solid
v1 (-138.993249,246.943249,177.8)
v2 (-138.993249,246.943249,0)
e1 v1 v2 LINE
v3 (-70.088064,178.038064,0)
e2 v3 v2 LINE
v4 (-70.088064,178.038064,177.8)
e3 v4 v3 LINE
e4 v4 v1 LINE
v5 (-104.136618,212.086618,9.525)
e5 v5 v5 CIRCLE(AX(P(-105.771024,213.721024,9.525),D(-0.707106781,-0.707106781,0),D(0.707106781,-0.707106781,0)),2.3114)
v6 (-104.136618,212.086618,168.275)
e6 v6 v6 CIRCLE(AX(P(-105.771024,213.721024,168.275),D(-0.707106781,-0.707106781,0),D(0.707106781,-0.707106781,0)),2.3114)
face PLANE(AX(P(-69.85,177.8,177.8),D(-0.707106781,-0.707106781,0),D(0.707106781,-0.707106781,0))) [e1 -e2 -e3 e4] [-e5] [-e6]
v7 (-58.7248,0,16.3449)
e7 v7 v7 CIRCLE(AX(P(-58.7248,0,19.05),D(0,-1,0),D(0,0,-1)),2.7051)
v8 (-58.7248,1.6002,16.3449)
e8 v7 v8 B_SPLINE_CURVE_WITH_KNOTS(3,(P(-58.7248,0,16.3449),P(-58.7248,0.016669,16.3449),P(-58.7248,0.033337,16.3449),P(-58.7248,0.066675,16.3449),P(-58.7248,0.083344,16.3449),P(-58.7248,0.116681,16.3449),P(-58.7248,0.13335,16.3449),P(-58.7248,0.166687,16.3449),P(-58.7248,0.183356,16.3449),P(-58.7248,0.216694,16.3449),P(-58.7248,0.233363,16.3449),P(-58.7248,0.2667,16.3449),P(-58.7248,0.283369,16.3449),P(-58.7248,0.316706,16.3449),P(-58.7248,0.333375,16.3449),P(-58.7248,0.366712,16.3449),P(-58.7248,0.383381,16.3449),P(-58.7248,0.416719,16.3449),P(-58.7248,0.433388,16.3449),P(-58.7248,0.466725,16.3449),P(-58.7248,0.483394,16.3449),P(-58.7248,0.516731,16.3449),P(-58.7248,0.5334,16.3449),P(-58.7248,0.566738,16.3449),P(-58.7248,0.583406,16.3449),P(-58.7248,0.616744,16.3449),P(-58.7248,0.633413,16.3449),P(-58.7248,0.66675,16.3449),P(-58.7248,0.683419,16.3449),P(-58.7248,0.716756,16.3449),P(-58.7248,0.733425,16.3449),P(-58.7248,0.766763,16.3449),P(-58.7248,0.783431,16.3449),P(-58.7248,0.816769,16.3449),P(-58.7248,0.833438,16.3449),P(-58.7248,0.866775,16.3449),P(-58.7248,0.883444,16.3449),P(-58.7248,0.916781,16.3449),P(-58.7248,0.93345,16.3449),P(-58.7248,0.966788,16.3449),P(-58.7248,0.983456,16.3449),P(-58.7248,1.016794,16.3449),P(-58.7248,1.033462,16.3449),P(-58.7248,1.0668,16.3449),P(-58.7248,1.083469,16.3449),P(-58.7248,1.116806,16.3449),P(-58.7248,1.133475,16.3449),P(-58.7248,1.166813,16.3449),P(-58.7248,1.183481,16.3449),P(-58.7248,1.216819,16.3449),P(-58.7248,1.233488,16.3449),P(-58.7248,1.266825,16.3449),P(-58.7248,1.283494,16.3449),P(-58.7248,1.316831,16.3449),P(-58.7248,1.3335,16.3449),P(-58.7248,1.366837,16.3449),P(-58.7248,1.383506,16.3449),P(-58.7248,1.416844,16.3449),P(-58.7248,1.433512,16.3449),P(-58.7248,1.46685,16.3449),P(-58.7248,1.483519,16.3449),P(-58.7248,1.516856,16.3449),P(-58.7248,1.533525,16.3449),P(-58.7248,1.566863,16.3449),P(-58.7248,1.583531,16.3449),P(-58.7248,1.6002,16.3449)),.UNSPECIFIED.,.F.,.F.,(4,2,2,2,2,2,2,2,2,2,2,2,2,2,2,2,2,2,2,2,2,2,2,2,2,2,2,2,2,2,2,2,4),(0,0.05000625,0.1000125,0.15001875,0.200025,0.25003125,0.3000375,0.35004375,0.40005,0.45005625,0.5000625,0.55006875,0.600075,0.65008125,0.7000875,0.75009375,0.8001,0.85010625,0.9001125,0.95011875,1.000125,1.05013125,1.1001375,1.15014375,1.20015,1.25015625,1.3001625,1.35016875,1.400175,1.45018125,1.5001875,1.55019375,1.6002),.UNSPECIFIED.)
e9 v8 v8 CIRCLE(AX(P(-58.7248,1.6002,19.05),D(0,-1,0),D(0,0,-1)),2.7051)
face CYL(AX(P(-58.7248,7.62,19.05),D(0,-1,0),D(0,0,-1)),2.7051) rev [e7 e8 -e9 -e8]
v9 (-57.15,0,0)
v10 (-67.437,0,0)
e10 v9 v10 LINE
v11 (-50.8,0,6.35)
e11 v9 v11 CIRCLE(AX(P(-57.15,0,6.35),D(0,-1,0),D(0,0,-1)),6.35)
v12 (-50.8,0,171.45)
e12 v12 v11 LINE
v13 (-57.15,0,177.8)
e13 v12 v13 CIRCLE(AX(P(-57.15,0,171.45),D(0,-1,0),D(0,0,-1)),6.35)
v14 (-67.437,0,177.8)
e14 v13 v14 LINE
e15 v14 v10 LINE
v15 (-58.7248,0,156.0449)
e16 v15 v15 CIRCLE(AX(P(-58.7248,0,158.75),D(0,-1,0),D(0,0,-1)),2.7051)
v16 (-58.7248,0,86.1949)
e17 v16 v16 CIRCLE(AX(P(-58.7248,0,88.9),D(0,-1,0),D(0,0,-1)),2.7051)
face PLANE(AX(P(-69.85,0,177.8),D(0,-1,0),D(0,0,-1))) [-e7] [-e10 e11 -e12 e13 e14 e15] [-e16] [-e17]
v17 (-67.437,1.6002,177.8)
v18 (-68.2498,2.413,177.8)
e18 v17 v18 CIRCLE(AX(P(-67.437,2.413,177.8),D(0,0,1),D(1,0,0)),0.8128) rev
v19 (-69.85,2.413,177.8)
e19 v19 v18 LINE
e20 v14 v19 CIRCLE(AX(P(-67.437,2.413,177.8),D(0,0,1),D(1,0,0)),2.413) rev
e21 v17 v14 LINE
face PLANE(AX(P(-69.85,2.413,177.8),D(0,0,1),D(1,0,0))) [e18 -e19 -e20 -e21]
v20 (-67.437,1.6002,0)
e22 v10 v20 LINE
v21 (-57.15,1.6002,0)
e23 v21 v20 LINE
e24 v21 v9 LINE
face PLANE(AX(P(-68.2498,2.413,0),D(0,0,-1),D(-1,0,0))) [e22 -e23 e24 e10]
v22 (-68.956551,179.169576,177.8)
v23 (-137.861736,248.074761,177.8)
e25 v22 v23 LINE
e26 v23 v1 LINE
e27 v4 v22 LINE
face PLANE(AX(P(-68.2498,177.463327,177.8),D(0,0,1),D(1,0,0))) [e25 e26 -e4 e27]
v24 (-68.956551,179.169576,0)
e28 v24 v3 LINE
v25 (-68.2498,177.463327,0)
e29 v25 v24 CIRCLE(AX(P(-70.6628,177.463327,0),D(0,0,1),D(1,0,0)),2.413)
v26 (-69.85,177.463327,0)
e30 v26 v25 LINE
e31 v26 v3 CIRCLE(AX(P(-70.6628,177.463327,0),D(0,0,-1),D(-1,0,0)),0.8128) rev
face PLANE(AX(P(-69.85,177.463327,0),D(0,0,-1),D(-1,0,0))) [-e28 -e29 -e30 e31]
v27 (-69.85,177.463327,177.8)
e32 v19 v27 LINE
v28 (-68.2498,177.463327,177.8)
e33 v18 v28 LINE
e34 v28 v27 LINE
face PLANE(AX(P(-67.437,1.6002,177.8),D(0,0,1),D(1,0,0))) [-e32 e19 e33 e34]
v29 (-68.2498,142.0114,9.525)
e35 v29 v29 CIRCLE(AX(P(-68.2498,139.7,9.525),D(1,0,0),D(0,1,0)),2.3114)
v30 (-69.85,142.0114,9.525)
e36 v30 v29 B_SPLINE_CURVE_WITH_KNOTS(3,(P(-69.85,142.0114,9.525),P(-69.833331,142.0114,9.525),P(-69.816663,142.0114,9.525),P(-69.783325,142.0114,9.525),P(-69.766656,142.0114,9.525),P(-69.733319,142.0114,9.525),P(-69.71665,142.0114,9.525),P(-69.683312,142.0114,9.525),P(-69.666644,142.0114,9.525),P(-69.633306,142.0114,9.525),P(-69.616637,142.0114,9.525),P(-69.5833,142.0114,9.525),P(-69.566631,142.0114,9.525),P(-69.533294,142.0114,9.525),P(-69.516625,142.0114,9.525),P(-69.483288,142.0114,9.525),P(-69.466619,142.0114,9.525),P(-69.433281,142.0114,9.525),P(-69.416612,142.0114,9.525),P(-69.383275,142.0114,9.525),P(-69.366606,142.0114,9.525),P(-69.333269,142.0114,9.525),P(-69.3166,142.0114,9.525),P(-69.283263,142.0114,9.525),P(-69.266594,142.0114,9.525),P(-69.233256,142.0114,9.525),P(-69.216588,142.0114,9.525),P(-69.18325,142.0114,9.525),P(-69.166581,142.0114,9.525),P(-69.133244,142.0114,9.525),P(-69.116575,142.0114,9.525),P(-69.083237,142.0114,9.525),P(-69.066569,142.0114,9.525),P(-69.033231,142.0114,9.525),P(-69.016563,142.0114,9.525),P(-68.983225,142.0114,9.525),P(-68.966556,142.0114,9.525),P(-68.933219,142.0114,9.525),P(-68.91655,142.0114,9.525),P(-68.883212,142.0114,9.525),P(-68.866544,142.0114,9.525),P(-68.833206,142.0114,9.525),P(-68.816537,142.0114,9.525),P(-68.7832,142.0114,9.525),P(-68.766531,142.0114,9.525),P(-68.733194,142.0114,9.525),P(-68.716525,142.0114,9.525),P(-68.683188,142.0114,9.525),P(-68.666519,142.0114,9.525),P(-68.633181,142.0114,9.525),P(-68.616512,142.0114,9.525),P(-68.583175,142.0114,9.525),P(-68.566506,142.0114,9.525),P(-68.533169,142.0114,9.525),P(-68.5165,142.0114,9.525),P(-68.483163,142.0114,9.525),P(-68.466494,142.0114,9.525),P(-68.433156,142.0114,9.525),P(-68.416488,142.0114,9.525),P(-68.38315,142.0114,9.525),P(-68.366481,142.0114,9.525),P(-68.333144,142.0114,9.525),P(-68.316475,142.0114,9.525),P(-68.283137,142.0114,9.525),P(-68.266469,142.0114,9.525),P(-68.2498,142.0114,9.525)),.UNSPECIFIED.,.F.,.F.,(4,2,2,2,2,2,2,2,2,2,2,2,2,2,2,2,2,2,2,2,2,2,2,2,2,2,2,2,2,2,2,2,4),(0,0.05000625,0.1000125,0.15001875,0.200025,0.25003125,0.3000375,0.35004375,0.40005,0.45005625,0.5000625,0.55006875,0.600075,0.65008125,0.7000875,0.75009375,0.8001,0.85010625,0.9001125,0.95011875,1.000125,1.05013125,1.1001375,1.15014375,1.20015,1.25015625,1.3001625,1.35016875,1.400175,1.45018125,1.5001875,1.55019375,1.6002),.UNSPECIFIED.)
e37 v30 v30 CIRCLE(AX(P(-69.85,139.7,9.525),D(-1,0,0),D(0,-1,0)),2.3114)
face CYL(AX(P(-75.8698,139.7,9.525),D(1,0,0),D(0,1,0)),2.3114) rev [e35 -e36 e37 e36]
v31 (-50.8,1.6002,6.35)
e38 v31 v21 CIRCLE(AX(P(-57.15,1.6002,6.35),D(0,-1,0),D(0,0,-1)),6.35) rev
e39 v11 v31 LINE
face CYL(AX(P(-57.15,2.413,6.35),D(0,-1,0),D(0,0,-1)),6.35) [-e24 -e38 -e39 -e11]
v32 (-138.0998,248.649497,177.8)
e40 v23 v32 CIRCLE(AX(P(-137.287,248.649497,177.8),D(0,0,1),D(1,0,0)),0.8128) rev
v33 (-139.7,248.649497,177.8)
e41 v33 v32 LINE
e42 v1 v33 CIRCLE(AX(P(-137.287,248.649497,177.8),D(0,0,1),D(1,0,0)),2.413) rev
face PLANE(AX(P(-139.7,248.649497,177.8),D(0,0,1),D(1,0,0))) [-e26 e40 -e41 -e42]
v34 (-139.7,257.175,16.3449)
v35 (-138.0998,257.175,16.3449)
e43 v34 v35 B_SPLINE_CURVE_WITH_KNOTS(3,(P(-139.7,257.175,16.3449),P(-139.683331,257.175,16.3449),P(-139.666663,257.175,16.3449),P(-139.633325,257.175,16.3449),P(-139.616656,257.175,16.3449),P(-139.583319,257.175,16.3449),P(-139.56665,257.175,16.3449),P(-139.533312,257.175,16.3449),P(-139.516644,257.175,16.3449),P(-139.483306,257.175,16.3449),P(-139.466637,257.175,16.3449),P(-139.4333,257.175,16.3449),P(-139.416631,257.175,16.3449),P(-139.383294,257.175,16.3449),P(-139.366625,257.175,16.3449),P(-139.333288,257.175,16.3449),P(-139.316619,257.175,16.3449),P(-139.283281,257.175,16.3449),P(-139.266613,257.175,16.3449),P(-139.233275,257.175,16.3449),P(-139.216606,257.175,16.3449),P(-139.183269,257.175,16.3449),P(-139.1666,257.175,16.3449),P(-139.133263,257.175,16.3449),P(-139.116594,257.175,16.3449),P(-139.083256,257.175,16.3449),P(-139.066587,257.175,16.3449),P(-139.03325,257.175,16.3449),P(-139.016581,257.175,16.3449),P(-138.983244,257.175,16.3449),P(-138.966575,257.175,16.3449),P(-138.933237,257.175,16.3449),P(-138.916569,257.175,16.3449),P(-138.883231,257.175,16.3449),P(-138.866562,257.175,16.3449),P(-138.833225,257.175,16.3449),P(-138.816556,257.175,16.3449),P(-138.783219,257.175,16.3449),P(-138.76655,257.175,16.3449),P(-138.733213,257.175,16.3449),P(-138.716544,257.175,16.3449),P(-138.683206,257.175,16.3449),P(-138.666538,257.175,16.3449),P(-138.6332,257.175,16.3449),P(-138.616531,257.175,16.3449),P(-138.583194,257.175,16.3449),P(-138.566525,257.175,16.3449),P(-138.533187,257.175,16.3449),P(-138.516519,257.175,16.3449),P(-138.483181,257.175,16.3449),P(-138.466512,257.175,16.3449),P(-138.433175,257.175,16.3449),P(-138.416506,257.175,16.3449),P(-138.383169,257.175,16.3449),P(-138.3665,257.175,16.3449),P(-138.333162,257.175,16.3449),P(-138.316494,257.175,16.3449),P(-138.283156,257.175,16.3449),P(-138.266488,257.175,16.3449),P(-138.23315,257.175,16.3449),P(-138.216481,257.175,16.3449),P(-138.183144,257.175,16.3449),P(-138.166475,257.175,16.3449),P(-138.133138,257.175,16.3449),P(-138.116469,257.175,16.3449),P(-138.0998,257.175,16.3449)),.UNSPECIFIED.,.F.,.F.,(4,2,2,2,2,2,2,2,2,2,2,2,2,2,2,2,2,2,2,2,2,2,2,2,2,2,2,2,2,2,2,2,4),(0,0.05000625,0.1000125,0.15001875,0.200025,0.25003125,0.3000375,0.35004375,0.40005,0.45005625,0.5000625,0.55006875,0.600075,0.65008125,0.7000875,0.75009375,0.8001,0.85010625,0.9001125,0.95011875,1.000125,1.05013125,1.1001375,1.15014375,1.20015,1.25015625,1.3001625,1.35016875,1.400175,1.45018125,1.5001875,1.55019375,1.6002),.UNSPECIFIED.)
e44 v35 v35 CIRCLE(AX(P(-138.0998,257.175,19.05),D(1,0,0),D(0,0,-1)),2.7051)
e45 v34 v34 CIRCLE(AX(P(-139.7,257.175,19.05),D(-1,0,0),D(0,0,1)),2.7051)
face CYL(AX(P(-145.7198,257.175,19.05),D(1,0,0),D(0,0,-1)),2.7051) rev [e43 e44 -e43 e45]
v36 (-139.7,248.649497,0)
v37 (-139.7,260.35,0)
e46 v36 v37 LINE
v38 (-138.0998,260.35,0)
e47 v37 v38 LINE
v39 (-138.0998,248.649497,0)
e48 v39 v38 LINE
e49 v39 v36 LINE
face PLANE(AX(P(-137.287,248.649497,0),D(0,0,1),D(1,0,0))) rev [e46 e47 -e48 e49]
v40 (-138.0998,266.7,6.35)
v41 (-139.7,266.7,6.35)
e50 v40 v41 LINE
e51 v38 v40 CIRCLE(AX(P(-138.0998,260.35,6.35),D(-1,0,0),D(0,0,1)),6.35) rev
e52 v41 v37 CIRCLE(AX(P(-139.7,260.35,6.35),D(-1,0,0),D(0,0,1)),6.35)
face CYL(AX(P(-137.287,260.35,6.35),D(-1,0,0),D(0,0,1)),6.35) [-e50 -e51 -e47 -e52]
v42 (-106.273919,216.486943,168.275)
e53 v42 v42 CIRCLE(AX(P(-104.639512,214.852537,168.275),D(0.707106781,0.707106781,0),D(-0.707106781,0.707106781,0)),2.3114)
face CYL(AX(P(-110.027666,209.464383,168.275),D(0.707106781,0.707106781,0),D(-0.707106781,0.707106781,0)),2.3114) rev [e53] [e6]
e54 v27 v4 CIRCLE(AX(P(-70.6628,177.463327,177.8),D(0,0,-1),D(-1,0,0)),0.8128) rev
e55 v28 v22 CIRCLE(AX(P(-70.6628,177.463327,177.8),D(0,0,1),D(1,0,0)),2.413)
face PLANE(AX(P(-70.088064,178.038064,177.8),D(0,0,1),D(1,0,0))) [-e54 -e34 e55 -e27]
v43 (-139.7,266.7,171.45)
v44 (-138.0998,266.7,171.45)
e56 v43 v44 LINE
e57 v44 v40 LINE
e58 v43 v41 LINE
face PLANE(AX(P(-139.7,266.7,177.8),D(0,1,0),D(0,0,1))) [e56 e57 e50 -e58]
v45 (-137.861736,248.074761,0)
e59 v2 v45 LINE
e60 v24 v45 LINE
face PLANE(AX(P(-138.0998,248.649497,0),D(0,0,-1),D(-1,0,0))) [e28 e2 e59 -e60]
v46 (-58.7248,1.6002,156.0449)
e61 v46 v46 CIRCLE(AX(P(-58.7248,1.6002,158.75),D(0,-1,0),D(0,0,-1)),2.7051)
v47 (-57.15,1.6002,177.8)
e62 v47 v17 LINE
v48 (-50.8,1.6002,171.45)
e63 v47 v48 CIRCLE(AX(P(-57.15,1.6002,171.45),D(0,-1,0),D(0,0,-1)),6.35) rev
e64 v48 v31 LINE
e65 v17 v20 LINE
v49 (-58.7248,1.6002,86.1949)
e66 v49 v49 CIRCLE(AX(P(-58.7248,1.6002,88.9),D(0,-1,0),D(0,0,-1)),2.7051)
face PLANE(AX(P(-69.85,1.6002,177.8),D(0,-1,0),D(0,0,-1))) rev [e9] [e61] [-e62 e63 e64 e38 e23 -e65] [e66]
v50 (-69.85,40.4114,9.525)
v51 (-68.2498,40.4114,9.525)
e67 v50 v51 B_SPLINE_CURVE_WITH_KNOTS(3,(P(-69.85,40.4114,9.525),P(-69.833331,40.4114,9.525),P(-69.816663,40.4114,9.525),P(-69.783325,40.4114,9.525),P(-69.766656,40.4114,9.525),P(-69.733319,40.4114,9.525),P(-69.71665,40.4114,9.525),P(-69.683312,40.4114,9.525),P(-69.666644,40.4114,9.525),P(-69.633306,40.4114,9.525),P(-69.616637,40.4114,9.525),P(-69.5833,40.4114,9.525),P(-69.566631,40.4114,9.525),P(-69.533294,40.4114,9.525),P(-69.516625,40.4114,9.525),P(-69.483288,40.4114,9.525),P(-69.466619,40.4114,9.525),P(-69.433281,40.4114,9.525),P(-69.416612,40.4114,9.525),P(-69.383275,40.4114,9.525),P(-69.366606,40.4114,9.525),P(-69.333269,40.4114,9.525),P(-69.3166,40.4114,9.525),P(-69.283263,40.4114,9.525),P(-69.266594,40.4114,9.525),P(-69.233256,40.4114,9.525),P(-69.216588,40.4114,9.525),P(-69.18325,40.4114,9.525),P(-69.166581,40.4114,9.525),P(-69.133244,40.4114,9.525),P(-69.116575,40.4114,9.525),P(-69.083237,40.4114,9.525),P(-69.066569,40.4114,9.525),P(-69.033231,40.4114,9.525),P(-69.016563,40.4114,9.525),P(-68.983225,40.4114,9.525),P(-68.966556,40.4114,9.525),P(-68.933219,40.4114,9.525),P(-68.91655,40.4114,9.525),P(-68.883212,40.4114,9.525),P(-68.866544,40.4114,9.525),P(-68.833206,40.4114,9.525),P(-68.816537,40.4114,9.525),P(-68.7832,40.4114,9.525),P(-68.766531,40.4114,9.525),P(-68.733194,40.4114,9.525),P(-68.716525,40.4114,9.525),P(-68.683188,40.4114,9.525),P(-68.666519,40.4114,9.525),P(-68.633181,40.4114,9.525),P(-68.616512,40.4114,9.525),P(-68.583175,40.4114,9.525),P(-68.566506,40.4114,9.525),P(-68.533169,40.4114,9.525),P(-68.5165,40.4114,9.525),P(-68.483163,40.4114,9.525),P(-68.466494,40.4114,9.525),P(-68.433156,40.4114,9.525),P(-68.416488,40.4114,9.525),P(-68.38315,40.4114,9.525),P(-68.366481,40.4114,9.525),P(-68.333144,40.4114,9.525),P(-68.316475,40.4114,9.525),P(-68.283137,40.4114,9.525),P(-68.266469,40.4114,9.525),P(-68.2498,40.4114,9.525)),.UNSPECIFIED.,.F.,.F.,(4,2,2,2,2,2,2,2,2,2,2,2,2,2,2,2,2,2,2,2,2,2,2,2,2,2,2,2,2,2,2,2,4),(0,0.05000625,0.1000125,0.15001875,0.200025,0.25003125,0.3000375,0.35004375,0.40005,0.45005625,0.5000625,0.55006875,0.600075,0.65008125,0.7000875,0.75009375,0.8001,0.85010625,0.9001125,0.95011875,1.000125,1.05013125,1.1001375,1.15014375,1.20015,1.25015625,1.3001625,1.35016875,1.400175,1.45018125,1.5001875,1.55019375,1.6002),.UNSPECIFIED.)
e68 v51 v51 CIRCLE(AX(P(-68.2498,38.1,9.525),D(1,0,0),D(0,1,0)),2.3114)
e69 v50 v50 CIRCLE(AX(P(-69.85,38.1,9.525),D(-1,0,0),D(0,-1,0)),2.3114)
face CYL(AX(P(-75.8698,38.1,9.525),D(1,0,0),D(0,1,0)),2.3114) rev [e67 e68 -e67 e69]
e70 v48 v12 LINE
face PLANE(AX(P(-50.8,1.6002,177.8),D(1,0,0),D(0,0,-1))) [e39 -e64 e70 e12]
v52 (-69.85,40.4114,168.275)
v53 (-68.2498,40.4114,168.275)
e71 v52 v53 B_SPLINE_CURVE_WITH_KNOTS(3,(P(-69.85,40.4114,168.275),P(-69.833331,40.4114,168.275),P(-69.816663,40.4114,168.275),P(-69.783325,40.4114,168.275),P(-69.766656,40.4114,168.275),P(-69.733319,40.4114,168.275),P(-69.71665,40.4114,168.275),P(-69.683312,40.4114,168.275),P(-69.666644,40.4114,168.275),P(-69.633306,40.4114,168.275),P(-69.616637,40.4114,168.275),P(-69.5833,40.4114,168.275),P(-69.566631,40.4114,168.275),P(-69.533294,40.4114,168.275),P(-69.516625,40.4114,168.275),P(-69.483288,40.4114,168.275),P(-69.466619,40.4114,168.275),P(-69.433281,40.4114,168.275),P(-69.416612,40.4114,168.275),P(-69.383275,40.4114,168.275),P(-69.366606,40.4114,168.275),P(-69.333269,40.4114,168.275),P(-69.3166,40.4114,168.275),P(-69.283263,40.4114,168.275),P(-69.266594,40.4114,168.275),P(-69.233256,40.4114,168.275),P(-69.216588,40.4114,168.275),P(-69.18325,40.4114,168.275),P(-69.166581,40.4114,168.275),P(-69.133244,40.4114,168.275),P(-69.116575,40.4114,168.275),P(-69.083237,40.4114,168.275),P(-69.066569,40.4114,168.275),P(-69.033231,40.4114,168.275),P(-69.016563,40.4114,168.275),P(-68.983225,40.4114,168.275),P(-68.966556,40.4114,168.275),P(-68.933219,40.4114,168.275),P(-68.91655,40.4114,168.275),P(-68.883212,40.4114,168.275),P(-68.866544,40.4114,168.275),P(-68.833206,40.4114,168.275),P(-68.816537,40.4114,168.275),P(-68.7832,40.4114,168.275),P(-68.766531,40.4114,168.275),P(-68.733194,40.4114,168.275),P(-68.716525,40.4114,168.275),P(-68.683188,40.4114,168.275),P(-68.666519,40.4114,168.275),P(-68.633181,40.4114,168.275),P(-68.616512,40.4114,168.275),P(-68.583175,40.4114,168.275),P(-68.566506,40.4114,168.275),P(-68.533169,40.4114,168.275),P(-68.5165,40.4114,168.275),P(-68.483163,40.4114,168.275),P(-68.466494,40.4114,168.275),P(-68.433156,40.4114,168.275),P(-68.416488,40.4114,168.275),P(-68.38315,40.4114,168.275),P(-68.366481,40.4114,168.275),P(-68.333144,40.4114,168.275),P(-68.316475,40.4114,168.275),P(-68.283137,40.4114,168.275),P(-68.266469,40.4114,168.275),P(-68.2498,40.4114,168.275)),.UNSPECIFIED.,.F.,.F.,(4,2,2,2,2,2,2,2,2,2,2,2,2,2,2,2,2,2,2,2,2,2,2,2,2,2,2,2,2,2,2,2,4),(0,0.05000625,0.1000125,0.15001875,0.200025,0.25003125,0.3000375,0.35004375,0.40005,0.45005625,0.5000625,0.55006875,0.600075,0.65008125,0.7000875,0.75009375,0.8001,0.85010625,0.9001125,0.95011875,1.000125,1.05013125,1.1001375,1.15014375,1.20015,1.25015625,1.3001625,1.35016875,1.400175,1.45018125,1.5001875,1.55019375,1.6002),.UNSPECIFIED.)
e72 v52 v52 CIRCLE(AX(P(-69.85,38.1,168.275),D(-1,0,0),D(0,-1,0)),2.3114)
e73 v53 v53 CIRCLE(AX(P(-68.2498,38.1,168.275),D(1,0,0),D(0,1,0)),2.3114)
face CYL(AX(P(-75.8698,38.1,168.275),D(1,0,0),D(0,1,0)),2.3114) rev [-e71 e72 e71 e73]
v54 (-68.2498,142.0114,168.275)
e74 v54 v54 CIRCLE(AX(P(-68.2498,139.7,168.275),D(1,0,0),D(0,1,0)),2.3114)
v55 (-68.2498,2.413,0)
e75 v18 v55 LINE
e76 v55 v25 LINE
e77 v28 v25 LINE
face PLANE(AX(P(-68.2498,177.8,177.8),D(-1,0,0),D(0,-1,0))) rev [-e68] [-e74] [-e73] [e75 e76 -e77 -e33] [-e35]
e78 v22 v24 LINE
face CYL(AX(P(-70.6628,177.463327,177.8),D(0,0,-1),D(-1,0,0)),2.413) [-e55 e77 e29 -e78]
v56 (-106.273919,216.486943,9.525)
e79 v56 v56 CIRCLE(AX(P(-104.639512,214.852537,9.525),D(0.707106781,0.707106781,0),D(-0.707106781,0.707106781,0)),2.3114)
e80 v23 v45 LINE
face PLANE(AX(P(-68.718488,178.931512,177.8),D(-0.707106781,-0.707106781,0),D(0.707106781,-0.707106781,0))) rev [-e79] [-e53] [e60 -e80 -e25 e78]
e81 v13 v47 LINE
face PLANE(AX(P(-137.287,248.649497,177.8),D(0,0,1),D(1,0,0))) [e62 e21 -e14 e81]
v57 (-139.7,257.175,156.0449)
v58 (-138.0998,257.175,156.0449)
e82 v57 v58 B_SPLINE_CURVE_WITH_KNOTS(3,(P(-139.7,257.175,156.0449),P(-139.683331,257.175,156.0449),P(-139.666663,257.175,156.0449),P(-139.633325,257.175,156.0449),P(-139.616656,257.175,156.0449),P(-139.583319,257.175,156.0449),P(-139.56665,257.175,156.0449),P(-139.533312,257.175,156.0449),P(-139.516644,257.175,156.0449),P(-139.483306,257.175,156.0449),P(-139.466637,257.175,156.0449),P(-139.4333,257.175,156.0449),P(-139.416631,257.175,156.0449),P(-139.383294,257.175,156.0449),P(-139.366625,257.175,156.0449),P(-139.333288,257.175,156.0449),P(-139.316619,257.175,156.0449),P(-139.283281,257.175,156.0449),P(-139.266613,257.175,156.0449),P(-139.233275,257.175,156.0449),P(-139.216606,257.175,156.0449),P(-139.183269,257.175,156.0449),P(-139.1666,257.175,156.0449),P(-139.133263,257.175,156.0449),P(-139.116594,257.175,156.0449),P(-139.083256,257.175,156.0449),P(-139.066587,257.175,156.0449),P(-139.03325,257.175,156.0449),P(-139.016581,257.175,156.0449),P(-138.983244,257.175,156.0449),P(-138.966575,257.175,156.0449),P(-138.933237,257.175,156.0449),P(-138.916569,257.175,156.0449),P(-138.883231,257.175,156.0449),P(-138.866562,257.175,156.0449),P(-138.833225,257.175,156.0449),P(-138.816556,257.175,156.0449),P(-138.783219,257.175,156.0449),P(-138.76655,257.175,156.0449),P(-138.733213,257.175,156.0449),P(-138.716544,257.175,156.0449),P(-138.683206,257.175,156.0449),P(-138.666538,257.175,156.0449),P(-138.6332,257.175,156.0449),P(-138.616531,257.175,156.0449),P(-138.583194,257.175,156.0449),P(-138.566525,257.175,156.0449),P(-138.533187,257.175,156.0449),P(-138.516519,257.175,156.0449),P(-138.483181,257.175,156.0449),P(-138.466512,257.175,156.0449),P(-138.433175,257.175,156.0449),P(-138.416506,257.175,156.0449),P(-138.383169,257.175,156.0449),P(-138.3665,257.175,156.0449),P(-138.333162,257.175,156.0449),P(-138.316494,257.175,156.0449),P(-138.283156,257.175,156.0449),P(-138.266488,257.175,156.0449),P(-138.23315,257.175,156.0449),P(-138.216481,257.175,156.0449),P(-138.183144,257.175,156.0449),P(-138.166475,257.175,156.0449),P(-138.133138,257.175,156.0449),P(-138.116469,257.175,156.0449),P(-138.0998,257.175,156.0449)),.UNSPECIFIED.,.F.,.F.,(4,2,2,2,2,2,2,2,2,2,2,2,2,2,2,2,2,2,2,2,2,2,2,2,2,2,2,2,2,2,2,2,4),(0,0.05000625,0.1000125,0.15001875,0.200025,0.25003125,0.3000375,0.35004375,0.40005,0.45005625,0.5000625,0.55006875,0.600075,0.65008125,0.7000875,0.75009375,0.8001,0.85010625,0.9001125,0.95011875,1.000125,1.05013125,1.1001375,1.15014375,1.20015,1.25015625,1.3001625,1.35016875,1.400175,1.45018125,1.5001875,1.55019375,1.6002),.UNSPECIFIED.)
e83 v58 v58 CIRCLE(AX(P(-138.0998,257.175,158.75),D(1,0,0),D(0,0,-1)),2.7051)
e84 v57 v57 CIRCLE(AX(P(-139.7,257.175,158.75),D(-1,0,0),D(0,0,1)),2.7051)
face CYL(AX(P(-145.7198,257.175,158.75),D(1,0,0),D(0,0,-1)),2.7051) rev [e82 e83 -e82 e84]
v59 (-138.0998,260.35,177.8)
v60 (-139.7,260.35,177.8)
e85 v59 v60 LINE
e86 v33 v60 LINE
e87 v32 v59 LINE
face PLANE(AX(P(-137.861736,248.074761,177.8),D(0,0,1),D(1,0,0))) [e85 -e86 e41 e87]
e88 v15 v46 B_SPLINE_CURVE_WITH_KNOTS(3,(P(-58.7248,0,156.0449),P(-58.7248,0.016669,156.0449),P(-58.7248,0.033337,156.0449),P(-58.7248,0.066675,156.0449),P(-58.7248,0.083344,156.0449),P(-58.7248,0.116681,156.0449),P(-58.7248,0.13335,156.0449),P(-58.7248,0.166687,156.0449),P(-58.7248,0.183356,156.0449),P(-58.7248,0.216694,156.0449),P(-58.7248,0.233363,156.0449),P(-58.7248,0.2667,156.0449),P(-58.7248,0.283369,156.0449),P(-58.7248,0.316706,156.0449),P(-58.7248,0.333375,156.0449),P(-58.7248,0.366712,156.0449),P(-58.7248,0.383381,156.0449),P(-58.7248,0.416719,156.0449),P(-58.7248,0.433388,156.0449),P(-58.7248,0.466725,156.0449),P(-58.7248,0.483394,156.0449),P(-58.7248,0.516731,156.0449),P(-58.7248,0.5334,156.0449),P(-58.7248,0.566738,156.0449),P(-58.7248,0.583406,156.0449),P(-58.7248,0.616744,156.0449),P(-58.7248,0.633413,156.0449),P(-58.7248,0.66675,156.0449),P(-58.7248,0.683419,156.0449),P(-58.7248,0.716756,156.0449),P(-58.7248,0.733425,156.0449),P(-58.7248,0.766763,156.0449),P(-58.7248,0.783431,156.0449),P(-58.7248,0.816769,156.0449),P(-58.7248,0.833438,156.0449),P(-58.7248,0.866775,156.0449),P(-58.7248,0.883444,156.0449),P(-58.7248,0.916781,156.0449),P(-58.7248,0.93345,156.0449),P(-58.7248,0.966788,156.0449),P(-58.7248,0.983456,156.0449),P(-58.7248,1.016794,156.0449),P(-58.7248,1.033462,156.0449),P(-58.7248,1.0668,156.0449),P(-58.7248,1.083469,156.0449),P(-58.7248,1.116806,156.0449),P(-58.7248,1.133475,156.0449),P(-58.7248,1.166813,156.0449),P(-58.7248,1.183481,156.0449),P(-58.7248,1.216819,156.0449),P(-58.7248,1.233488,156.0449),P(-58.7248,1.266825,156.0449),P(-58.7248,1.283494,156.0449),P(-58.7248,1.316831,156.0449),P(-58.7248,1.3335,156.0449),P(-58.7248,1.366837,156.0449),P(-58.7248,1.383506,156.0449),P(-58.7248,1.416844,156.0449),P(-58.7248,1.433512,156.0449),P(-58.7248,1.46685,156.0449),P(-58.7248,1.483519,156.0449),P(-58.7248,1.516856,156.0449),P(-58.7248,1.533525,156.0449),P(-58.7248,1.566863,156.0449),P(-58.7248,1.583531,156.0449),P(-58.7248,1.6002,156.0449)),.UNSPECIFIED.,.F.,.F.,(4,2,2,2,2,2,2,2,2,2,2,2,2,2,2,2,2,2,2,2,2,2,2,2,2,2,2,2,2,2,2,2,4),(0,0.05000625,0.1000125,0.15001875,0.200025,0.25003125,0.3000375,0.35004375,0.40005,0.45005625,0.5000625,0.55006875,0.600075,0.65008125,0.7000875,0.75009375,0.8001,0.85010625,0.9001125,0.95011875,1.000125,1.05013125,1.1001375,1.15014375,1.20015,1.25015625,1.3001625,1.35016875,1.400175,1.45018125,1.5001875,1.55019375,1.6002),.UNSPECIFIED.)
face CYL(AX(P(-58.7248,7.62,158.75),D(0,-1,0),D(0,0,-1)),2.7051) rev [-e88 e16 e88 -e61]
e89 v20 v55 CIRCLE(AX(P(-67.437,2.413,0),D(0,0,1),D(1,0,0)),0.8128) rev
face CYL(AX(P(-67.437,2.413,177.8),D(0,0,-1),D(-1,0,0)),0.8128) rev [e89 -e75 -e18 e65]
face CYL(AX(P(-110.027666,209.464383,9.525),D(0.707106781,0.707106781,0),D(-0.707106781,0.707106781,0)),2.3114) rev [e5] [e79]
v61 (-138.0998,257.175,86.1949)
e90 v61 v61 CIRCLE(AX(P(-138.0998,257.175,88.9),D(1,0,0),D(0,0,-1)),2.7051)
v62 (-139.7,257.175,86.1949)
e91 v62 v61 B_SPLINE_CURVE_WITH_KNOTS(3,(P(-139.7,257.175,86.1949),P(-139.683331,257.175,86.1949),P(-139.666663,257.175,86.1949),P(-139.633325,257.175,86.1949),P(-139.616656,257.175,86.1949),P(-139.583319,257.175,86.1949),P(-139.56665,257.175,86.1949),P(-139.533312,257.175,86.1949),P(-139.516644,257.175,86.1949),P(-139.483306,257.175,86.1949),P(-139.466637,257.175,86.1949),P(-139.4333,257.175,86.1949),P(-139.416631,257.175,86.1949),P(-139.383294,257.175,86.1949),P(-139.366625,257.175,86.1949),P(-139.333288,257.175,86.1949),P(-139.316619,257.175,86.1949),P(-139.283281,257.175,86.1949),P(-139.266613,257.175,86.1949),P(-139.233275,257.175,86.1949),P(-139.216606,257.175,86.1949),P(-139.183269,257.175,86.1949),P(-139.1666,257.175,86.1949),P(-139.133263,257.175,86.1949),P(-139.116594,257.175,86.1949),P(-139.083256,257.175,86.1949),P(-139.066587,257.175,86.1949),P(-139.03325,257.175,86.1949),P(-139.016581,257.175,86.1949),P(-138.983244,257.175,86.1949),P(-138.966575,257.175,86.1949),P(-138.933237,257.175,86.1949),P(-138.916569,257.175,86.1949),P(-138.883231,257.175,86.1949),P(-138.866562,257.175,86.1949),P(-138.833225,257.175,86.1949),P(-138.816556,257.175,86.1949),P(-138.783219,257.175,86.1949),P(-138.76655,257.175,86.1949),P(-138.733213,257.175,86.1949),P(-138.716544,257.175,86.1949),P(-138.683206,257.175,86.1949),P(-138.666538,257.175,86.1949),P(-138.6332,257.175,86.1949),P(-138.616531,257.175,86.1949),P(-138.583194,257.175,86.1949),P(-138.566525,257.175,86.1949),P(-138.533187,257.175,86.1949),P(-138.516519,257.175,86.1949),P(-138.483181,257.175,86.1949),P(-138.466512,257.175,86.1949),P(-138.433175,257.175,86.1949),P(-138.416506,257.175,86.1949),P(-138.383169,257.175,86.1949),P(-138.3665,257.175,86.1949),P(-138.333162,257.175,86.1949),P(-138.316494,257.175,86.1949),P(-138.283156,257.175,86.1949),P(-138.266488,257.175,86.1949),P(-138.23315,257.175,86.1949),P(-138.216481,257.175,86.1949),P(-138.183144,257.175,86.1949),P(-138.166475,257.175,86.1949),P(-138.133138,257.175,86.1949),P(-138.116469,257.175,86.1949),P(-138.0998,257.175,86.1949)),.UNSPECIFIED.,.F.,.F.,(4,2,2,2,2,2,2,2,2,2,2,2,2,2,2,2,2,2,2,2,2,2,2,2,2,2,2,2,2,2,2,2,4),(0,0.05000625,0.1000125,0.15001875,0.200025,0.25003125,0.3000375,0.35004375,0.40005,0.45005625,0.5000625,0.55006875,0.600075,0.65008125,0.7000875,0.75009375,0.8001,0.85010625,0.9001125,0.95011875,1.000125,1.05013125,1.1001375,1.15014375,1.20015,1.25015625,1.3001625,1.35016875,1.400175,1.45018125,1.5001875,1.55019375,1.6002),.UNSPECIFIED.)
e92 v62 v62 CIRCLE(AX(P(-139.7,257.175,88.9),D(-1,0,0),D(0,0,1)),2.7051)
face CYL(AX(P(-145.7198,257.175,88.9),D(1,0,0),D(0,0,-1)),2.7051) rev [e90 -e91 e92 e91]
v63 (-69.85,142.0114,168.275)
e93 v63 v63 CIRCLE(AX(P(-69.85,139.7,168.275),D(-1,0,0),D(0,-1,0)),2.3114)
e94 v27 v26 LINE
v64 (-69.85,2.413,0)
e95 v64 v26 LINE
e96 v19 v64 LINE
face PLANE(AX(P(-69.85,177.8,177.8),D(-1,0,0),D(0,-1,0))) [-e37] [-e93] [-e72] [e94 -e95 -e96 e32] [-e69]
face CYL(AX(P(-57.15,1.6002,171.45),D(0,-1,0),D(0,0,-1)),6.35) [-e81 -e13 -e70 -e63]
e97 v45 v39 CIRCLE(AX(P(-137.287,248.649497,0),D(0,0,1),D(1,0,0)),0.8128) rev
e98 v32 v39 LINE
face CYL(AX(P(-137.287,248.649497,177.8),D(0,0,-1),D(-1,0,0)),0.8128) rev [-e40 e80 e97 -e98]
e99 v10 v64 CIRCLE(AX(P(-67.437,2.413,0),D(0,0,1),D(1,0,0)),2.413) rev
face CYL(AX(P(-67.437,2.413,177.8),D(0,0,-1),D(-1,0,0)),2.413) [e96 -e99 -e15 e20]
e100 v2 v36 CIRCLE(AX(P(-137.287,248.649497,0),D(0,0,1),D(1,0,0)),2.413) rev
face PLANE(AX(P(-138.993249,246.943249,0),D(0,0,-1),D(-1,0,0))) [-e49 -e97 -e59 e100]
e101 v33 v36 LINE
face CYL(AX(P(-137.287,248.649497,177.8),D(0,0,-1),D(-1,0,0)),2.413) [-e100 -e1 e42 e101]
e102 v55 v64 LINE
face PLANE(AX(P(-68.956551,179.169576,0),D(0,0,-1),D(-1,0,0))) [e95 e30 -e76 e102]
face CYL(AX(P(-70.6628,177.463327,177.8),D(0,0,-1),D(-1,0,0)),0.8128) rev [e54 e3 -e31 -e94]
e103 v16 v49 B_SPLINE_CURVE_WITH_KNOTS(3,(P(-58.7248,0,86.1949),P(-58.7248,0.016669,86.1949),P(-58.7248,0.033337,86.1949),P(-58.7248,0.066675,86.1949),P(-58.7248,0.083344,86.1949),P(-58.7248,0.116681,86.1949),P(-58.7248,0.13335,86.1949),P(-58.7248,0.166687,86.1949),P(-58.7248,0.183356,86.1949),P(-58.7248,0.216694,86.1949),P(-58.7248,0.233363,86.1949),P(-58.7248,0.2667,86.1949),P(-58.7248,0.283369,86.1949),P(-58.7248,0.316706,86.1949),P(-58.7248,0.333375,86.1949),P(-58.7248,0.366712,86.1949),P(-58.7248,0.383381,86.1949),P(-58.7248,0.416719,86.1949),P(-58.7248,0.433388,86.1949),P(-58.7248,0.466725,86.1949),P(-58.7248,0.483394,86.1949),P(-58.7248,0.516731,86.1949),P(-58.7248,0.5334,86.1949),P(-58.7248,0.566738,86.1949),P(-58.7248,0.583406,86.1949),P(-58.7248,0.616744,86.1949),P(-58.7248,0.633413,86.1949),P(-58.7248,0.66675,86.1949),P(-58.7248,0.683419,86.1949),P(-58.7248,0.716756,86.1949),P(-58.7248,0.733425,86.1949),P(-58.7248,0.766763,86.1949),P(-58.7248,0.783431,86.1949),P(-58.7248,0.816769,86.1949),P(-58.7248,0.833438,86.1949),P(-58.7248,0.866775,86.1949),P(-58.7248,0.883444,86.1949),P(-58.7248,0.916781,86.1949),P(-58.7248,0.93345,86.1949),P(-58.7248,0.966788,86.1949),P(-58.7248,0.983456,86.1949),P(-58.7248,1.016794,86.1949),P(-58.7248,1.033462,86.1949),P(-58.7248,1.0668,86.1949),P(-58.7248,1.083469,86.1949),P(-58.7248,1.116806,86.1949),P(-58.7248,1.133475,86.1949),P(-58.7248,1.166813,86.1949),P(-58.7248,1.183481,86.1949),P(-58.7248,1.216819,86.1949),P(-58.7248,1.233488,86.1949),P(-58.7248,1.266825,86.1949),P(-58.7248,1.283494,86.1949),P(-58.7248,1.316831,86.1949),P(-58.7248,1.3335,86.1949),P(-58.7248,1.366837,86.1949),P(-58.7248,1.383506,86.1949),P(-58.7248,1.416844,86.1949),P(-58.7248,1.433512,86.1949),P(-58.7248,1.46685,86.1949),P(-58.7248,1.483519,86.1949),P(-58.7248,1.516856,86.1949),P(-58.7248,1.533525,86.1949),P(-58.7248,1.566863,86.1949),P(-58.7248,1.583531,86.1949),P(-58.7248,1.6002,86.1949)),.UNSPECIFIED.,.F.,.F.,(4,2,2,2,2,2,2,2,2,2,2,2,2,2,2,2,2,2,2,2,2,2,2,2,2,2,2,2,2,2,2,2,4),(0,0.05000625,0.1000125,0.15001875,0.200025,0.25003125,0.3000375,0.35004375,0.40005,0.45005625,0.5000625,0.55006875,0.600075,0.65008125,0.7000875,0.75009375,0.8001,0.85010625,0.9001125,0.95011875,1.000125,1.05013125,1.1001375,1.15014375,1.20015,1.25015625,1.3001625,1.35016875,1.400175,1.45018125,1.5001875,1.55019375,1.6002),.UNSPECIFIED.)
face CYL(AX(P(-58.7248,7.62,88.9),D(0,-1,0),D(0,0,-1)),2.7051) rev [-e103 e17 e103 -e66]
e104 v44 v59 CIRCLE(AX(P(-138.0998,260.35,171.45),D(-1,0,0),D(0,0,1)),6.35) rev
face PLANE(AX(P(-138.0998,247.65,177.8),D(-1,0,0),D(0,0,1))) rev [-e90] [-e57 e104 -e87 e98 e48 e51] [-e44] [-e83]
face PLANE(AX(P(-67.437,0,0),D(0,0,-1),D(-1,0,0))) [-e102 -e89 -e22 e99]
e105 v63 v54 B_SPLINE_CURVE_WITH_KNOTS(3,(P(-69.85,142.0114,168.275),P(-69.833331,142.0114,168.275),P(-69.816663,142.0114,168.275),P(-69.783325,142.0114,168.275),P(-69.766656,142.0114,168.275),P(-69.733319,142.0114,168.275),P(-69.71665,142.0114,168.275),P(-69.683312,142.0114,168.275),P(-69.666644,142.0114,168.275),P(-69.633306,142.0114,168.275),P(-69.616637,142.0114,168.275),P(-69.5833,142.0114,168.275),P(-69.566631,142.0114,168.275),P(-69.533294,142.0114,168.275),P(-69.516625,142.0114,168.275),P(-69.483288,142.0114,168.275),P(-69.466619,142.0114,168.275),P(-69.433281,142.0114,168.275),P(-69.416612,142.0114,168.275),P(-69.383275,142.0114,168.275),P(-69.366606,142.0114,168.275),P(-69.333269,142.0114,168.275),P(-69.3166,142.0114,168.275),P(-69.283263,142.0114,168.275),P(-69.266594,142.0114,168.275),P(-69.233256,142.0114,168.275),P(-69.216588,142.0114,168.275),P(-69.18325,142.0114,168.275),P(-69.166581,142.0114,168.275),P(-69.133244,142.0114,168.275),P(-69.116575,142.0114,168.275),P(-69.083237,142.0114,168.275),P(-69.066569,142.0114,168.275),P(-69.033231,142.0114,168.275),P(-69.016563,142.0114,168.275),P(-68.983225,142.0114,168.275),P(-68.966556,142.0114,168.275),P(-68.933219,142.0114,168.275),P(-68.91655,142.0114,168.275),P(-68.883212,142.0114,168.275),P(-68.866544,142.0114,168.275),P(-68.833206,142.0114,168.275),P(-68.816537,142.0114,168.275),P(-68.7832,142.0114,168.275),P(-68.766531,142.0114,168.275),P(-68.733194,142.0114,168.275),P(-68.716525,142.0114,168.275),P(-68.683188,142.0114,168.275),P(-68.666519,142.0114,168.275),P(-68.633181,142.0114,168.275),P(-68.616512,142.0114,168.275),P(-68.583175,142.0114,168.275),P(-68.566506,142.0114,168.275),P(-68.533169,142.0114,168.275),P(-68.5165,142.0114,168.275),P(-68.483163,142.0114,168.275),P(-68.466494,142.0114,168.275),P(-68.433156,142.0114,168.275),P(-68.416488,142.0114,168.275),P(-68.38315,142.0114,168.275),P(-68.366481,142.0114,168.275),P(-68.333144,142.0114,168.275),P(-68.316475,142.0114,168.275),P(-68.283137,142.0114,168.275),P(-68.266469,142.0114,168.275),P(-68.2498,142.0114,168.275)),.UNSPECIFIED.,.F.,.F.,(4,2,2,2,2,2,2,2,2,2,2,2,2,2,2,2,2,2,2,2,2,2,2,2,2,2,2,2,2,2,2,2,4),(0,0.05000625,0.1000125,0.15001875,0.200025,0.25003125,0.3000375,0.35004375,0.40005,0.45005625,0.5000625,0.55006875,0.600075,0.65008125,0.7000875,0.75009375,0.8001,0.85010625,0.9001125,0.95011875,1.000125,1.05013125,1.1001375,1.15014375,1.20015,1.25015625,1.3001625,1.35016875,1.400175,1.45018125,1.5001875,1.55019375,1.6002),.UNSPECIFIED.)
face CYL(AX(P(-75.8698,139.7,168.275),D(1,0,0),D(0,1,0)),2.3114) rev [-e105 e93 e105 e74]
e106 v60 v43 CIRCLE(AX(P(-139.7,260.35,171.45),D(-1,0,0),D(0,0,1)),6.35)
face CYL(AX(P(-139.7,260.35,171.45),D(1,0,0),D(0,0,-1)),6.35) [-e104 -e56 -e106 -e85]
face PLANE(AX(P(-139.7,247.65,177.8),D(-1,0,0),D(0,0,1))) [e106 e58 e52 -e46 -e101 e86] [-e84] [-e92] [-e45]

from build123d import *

# Parameters (mm, degrees)
BASE_FLANGE1_DEPTH       = 177.8
SKETCH2_R                = 2.7051
CUT_EXTRUDE1_0213_DEPTH  = 7.62
SKETCH3_R                = 2.3114
CUT_EXTRUDE2_0_182_DEPTH = 7.62
SKETCH4_R                = 2.3114
CUT_EXTRUDE4_0_182_DEPTH = 7.62
SKETCH5_R                = 2.7051
CUT_EXTRUDE3_0_213_DEPTH = 7.62
FILLET1_R                = 6.35


# Sheet-metal steps are written as plain solids
with BuildPart() as part:
    # Sketch1 → Base-Flange1 (new body)
    with BuildSketch(Plane.XY):
        with BuildLine():
            Line((-139.7, 266.7), (-139.7, 248.649497326))
            ThreePointArc((-139.7, 248.649497326), (-139.516321312, 247.726082204), (-138.993248663, 246.943248663))
            Line((-138.993248663, 246.943248663), (-70.088063608, 178.038063608))
            ThreePointArc((-70.088063608, 178.038063608), (-69.911870716, 177.77437231), (-69.85, 177.463327217))
            Line((-69.85, 177.463327217), (-69.85, 2.413))
            ThreePointArc((-69.85, 2.413), (-69.143248663, 0.706751337), (-67.437, 0))
            Line((-67.437, 0), (-50.8, 0))
            Line((-50.8, 0), (-50.8, 1.6002))
            Line((-50.8, 1.6002), (-67.437, 1.6002))
            ThreePointArc((-67.437, 1.6002), (-68.011736392, 1.838263608), (-68.2498, 2.413))
            Line((-68.2498, 2.413), (-68.2498, 177.463327217))
            ThreePointArc((-68.2498, 177.463327216), (-68.433478688, 178.386742339), (-68.956551337, 179.16957588))
            Line((-68.956551337, 179.16957588), (-137.861736392, 248.074760934))
            ThreePointArc((-137.861736392, 248.074760934), (-138.037929284, 248.338452232), (-138.0998, 248.649497326))
            Line((-138.0998, 248.649497326), (-138.0998, 266.7))
            Line((-138.0998, 266.7), (-139.7, 266.7))
        make_face()
    extrude(amount=BASE_FLANGE1_DEPTH)

    # Sketch2 → Cut-Extrude1 .0213 (cut)
    with BuildSketch(Plane.XZ):
        with Locations(Location((-58.7248, 19.05, 0), (0, 0, 270))):
            Circle(SKETCH2_R)
        with Locations(Location((-58.7248, 88.9, 0), (0, 0, 270))):
            Circle(SKETCH2_R)
        with Locations(Location((-58.7248, 158.75, 0), (0, 0, 270))):
            Circle(SKETCH2_R)
    extrude(amount=-CUT_EXTRUDE1_0213_DEPTH, mode=Mode.SUBTRACT)

    # Sketch3 → Cut-Extrude2 0.182 (cut)
    with BuildSketch(Plane(origin=(-68.2498, 0, 0), x_dir=(0, 0, -1), z_dir=(1, 0, 0))):
        with Locations(Location((-168.275, 139.7, 0), (0, 0, 90))):
            Circle(SKETCH3_R)
        with Locations(Location((-168.275, 38.1, 0), (0, 0, 90))):
            Circle(SKETCH3_R)
        with Locations(Location((-9.525, 139.7, 0), (0, 0, 90))):
            Circle(SKETCH3_R)
        with Locations(Location((-9.525, 38.1, 0), (0, 0, 90))):
            Circle(SKETCH3_R)
    extrude(amount=-CUT_EXTRUDE2_0_182_DEPTH, mode=Mode.SUBTRACT)

    # Sketch4 → Cut-Extrude4 0.182 (cut)
    with BuildSketch(Plane(origin=(55.106512271, 55.106512271, 0), x_dir=(0, 0, -1), z_dir=(0.7071067811865511, 0.707106781186544, 0))):
        with Locations(Location((-168.275, 225.914994361, 0), (0, 0, 90))):
            Circle(SKETCH4_R)
        with Locations(Location((-9.525, 225.914994361, 0), (0, 0, 90))):
            Circle(SKETCH4_R)
    extrude(amount=-CUT_EXTRUDE4_0_182_DEPTH, mode=Mode.SUBTRACT)

    # Sketch5 → Cut-Extrude3 0.213 (cut)
    with BuildSketch(Plane(origin=(-138.0998, 0, 0), x_dir=(0, 0, -1), z_dir=(1, 0, 0))):
        with Locations((-158.75, 257.175)):
            Circle(SKETCH5_R)
        with Locations((-88.9, 257.175)):
            Circle(SKETCH5_R)
        with Locations((-19.05, 257.175)):
            Circle(SKETCH5_R)
    extrude(amount=-CUT_EXTRUDE3_0_213_DEPTH, mode=Mode.SUBTRACT)

    # Fillet1
    fillet1_edges = [part.edges().sort_by_distance(p)[0] for p in [
        (-50.8, 0.8001, 0),
        (-138.8999, 266.7, 0),
        (-50.8, 0.8001, 177.8),
        (-138.8999, 266.7, 177.8),
    ]]
    fillet(fillet1_edges, radius=FILLET1_R)


solid = part.part
